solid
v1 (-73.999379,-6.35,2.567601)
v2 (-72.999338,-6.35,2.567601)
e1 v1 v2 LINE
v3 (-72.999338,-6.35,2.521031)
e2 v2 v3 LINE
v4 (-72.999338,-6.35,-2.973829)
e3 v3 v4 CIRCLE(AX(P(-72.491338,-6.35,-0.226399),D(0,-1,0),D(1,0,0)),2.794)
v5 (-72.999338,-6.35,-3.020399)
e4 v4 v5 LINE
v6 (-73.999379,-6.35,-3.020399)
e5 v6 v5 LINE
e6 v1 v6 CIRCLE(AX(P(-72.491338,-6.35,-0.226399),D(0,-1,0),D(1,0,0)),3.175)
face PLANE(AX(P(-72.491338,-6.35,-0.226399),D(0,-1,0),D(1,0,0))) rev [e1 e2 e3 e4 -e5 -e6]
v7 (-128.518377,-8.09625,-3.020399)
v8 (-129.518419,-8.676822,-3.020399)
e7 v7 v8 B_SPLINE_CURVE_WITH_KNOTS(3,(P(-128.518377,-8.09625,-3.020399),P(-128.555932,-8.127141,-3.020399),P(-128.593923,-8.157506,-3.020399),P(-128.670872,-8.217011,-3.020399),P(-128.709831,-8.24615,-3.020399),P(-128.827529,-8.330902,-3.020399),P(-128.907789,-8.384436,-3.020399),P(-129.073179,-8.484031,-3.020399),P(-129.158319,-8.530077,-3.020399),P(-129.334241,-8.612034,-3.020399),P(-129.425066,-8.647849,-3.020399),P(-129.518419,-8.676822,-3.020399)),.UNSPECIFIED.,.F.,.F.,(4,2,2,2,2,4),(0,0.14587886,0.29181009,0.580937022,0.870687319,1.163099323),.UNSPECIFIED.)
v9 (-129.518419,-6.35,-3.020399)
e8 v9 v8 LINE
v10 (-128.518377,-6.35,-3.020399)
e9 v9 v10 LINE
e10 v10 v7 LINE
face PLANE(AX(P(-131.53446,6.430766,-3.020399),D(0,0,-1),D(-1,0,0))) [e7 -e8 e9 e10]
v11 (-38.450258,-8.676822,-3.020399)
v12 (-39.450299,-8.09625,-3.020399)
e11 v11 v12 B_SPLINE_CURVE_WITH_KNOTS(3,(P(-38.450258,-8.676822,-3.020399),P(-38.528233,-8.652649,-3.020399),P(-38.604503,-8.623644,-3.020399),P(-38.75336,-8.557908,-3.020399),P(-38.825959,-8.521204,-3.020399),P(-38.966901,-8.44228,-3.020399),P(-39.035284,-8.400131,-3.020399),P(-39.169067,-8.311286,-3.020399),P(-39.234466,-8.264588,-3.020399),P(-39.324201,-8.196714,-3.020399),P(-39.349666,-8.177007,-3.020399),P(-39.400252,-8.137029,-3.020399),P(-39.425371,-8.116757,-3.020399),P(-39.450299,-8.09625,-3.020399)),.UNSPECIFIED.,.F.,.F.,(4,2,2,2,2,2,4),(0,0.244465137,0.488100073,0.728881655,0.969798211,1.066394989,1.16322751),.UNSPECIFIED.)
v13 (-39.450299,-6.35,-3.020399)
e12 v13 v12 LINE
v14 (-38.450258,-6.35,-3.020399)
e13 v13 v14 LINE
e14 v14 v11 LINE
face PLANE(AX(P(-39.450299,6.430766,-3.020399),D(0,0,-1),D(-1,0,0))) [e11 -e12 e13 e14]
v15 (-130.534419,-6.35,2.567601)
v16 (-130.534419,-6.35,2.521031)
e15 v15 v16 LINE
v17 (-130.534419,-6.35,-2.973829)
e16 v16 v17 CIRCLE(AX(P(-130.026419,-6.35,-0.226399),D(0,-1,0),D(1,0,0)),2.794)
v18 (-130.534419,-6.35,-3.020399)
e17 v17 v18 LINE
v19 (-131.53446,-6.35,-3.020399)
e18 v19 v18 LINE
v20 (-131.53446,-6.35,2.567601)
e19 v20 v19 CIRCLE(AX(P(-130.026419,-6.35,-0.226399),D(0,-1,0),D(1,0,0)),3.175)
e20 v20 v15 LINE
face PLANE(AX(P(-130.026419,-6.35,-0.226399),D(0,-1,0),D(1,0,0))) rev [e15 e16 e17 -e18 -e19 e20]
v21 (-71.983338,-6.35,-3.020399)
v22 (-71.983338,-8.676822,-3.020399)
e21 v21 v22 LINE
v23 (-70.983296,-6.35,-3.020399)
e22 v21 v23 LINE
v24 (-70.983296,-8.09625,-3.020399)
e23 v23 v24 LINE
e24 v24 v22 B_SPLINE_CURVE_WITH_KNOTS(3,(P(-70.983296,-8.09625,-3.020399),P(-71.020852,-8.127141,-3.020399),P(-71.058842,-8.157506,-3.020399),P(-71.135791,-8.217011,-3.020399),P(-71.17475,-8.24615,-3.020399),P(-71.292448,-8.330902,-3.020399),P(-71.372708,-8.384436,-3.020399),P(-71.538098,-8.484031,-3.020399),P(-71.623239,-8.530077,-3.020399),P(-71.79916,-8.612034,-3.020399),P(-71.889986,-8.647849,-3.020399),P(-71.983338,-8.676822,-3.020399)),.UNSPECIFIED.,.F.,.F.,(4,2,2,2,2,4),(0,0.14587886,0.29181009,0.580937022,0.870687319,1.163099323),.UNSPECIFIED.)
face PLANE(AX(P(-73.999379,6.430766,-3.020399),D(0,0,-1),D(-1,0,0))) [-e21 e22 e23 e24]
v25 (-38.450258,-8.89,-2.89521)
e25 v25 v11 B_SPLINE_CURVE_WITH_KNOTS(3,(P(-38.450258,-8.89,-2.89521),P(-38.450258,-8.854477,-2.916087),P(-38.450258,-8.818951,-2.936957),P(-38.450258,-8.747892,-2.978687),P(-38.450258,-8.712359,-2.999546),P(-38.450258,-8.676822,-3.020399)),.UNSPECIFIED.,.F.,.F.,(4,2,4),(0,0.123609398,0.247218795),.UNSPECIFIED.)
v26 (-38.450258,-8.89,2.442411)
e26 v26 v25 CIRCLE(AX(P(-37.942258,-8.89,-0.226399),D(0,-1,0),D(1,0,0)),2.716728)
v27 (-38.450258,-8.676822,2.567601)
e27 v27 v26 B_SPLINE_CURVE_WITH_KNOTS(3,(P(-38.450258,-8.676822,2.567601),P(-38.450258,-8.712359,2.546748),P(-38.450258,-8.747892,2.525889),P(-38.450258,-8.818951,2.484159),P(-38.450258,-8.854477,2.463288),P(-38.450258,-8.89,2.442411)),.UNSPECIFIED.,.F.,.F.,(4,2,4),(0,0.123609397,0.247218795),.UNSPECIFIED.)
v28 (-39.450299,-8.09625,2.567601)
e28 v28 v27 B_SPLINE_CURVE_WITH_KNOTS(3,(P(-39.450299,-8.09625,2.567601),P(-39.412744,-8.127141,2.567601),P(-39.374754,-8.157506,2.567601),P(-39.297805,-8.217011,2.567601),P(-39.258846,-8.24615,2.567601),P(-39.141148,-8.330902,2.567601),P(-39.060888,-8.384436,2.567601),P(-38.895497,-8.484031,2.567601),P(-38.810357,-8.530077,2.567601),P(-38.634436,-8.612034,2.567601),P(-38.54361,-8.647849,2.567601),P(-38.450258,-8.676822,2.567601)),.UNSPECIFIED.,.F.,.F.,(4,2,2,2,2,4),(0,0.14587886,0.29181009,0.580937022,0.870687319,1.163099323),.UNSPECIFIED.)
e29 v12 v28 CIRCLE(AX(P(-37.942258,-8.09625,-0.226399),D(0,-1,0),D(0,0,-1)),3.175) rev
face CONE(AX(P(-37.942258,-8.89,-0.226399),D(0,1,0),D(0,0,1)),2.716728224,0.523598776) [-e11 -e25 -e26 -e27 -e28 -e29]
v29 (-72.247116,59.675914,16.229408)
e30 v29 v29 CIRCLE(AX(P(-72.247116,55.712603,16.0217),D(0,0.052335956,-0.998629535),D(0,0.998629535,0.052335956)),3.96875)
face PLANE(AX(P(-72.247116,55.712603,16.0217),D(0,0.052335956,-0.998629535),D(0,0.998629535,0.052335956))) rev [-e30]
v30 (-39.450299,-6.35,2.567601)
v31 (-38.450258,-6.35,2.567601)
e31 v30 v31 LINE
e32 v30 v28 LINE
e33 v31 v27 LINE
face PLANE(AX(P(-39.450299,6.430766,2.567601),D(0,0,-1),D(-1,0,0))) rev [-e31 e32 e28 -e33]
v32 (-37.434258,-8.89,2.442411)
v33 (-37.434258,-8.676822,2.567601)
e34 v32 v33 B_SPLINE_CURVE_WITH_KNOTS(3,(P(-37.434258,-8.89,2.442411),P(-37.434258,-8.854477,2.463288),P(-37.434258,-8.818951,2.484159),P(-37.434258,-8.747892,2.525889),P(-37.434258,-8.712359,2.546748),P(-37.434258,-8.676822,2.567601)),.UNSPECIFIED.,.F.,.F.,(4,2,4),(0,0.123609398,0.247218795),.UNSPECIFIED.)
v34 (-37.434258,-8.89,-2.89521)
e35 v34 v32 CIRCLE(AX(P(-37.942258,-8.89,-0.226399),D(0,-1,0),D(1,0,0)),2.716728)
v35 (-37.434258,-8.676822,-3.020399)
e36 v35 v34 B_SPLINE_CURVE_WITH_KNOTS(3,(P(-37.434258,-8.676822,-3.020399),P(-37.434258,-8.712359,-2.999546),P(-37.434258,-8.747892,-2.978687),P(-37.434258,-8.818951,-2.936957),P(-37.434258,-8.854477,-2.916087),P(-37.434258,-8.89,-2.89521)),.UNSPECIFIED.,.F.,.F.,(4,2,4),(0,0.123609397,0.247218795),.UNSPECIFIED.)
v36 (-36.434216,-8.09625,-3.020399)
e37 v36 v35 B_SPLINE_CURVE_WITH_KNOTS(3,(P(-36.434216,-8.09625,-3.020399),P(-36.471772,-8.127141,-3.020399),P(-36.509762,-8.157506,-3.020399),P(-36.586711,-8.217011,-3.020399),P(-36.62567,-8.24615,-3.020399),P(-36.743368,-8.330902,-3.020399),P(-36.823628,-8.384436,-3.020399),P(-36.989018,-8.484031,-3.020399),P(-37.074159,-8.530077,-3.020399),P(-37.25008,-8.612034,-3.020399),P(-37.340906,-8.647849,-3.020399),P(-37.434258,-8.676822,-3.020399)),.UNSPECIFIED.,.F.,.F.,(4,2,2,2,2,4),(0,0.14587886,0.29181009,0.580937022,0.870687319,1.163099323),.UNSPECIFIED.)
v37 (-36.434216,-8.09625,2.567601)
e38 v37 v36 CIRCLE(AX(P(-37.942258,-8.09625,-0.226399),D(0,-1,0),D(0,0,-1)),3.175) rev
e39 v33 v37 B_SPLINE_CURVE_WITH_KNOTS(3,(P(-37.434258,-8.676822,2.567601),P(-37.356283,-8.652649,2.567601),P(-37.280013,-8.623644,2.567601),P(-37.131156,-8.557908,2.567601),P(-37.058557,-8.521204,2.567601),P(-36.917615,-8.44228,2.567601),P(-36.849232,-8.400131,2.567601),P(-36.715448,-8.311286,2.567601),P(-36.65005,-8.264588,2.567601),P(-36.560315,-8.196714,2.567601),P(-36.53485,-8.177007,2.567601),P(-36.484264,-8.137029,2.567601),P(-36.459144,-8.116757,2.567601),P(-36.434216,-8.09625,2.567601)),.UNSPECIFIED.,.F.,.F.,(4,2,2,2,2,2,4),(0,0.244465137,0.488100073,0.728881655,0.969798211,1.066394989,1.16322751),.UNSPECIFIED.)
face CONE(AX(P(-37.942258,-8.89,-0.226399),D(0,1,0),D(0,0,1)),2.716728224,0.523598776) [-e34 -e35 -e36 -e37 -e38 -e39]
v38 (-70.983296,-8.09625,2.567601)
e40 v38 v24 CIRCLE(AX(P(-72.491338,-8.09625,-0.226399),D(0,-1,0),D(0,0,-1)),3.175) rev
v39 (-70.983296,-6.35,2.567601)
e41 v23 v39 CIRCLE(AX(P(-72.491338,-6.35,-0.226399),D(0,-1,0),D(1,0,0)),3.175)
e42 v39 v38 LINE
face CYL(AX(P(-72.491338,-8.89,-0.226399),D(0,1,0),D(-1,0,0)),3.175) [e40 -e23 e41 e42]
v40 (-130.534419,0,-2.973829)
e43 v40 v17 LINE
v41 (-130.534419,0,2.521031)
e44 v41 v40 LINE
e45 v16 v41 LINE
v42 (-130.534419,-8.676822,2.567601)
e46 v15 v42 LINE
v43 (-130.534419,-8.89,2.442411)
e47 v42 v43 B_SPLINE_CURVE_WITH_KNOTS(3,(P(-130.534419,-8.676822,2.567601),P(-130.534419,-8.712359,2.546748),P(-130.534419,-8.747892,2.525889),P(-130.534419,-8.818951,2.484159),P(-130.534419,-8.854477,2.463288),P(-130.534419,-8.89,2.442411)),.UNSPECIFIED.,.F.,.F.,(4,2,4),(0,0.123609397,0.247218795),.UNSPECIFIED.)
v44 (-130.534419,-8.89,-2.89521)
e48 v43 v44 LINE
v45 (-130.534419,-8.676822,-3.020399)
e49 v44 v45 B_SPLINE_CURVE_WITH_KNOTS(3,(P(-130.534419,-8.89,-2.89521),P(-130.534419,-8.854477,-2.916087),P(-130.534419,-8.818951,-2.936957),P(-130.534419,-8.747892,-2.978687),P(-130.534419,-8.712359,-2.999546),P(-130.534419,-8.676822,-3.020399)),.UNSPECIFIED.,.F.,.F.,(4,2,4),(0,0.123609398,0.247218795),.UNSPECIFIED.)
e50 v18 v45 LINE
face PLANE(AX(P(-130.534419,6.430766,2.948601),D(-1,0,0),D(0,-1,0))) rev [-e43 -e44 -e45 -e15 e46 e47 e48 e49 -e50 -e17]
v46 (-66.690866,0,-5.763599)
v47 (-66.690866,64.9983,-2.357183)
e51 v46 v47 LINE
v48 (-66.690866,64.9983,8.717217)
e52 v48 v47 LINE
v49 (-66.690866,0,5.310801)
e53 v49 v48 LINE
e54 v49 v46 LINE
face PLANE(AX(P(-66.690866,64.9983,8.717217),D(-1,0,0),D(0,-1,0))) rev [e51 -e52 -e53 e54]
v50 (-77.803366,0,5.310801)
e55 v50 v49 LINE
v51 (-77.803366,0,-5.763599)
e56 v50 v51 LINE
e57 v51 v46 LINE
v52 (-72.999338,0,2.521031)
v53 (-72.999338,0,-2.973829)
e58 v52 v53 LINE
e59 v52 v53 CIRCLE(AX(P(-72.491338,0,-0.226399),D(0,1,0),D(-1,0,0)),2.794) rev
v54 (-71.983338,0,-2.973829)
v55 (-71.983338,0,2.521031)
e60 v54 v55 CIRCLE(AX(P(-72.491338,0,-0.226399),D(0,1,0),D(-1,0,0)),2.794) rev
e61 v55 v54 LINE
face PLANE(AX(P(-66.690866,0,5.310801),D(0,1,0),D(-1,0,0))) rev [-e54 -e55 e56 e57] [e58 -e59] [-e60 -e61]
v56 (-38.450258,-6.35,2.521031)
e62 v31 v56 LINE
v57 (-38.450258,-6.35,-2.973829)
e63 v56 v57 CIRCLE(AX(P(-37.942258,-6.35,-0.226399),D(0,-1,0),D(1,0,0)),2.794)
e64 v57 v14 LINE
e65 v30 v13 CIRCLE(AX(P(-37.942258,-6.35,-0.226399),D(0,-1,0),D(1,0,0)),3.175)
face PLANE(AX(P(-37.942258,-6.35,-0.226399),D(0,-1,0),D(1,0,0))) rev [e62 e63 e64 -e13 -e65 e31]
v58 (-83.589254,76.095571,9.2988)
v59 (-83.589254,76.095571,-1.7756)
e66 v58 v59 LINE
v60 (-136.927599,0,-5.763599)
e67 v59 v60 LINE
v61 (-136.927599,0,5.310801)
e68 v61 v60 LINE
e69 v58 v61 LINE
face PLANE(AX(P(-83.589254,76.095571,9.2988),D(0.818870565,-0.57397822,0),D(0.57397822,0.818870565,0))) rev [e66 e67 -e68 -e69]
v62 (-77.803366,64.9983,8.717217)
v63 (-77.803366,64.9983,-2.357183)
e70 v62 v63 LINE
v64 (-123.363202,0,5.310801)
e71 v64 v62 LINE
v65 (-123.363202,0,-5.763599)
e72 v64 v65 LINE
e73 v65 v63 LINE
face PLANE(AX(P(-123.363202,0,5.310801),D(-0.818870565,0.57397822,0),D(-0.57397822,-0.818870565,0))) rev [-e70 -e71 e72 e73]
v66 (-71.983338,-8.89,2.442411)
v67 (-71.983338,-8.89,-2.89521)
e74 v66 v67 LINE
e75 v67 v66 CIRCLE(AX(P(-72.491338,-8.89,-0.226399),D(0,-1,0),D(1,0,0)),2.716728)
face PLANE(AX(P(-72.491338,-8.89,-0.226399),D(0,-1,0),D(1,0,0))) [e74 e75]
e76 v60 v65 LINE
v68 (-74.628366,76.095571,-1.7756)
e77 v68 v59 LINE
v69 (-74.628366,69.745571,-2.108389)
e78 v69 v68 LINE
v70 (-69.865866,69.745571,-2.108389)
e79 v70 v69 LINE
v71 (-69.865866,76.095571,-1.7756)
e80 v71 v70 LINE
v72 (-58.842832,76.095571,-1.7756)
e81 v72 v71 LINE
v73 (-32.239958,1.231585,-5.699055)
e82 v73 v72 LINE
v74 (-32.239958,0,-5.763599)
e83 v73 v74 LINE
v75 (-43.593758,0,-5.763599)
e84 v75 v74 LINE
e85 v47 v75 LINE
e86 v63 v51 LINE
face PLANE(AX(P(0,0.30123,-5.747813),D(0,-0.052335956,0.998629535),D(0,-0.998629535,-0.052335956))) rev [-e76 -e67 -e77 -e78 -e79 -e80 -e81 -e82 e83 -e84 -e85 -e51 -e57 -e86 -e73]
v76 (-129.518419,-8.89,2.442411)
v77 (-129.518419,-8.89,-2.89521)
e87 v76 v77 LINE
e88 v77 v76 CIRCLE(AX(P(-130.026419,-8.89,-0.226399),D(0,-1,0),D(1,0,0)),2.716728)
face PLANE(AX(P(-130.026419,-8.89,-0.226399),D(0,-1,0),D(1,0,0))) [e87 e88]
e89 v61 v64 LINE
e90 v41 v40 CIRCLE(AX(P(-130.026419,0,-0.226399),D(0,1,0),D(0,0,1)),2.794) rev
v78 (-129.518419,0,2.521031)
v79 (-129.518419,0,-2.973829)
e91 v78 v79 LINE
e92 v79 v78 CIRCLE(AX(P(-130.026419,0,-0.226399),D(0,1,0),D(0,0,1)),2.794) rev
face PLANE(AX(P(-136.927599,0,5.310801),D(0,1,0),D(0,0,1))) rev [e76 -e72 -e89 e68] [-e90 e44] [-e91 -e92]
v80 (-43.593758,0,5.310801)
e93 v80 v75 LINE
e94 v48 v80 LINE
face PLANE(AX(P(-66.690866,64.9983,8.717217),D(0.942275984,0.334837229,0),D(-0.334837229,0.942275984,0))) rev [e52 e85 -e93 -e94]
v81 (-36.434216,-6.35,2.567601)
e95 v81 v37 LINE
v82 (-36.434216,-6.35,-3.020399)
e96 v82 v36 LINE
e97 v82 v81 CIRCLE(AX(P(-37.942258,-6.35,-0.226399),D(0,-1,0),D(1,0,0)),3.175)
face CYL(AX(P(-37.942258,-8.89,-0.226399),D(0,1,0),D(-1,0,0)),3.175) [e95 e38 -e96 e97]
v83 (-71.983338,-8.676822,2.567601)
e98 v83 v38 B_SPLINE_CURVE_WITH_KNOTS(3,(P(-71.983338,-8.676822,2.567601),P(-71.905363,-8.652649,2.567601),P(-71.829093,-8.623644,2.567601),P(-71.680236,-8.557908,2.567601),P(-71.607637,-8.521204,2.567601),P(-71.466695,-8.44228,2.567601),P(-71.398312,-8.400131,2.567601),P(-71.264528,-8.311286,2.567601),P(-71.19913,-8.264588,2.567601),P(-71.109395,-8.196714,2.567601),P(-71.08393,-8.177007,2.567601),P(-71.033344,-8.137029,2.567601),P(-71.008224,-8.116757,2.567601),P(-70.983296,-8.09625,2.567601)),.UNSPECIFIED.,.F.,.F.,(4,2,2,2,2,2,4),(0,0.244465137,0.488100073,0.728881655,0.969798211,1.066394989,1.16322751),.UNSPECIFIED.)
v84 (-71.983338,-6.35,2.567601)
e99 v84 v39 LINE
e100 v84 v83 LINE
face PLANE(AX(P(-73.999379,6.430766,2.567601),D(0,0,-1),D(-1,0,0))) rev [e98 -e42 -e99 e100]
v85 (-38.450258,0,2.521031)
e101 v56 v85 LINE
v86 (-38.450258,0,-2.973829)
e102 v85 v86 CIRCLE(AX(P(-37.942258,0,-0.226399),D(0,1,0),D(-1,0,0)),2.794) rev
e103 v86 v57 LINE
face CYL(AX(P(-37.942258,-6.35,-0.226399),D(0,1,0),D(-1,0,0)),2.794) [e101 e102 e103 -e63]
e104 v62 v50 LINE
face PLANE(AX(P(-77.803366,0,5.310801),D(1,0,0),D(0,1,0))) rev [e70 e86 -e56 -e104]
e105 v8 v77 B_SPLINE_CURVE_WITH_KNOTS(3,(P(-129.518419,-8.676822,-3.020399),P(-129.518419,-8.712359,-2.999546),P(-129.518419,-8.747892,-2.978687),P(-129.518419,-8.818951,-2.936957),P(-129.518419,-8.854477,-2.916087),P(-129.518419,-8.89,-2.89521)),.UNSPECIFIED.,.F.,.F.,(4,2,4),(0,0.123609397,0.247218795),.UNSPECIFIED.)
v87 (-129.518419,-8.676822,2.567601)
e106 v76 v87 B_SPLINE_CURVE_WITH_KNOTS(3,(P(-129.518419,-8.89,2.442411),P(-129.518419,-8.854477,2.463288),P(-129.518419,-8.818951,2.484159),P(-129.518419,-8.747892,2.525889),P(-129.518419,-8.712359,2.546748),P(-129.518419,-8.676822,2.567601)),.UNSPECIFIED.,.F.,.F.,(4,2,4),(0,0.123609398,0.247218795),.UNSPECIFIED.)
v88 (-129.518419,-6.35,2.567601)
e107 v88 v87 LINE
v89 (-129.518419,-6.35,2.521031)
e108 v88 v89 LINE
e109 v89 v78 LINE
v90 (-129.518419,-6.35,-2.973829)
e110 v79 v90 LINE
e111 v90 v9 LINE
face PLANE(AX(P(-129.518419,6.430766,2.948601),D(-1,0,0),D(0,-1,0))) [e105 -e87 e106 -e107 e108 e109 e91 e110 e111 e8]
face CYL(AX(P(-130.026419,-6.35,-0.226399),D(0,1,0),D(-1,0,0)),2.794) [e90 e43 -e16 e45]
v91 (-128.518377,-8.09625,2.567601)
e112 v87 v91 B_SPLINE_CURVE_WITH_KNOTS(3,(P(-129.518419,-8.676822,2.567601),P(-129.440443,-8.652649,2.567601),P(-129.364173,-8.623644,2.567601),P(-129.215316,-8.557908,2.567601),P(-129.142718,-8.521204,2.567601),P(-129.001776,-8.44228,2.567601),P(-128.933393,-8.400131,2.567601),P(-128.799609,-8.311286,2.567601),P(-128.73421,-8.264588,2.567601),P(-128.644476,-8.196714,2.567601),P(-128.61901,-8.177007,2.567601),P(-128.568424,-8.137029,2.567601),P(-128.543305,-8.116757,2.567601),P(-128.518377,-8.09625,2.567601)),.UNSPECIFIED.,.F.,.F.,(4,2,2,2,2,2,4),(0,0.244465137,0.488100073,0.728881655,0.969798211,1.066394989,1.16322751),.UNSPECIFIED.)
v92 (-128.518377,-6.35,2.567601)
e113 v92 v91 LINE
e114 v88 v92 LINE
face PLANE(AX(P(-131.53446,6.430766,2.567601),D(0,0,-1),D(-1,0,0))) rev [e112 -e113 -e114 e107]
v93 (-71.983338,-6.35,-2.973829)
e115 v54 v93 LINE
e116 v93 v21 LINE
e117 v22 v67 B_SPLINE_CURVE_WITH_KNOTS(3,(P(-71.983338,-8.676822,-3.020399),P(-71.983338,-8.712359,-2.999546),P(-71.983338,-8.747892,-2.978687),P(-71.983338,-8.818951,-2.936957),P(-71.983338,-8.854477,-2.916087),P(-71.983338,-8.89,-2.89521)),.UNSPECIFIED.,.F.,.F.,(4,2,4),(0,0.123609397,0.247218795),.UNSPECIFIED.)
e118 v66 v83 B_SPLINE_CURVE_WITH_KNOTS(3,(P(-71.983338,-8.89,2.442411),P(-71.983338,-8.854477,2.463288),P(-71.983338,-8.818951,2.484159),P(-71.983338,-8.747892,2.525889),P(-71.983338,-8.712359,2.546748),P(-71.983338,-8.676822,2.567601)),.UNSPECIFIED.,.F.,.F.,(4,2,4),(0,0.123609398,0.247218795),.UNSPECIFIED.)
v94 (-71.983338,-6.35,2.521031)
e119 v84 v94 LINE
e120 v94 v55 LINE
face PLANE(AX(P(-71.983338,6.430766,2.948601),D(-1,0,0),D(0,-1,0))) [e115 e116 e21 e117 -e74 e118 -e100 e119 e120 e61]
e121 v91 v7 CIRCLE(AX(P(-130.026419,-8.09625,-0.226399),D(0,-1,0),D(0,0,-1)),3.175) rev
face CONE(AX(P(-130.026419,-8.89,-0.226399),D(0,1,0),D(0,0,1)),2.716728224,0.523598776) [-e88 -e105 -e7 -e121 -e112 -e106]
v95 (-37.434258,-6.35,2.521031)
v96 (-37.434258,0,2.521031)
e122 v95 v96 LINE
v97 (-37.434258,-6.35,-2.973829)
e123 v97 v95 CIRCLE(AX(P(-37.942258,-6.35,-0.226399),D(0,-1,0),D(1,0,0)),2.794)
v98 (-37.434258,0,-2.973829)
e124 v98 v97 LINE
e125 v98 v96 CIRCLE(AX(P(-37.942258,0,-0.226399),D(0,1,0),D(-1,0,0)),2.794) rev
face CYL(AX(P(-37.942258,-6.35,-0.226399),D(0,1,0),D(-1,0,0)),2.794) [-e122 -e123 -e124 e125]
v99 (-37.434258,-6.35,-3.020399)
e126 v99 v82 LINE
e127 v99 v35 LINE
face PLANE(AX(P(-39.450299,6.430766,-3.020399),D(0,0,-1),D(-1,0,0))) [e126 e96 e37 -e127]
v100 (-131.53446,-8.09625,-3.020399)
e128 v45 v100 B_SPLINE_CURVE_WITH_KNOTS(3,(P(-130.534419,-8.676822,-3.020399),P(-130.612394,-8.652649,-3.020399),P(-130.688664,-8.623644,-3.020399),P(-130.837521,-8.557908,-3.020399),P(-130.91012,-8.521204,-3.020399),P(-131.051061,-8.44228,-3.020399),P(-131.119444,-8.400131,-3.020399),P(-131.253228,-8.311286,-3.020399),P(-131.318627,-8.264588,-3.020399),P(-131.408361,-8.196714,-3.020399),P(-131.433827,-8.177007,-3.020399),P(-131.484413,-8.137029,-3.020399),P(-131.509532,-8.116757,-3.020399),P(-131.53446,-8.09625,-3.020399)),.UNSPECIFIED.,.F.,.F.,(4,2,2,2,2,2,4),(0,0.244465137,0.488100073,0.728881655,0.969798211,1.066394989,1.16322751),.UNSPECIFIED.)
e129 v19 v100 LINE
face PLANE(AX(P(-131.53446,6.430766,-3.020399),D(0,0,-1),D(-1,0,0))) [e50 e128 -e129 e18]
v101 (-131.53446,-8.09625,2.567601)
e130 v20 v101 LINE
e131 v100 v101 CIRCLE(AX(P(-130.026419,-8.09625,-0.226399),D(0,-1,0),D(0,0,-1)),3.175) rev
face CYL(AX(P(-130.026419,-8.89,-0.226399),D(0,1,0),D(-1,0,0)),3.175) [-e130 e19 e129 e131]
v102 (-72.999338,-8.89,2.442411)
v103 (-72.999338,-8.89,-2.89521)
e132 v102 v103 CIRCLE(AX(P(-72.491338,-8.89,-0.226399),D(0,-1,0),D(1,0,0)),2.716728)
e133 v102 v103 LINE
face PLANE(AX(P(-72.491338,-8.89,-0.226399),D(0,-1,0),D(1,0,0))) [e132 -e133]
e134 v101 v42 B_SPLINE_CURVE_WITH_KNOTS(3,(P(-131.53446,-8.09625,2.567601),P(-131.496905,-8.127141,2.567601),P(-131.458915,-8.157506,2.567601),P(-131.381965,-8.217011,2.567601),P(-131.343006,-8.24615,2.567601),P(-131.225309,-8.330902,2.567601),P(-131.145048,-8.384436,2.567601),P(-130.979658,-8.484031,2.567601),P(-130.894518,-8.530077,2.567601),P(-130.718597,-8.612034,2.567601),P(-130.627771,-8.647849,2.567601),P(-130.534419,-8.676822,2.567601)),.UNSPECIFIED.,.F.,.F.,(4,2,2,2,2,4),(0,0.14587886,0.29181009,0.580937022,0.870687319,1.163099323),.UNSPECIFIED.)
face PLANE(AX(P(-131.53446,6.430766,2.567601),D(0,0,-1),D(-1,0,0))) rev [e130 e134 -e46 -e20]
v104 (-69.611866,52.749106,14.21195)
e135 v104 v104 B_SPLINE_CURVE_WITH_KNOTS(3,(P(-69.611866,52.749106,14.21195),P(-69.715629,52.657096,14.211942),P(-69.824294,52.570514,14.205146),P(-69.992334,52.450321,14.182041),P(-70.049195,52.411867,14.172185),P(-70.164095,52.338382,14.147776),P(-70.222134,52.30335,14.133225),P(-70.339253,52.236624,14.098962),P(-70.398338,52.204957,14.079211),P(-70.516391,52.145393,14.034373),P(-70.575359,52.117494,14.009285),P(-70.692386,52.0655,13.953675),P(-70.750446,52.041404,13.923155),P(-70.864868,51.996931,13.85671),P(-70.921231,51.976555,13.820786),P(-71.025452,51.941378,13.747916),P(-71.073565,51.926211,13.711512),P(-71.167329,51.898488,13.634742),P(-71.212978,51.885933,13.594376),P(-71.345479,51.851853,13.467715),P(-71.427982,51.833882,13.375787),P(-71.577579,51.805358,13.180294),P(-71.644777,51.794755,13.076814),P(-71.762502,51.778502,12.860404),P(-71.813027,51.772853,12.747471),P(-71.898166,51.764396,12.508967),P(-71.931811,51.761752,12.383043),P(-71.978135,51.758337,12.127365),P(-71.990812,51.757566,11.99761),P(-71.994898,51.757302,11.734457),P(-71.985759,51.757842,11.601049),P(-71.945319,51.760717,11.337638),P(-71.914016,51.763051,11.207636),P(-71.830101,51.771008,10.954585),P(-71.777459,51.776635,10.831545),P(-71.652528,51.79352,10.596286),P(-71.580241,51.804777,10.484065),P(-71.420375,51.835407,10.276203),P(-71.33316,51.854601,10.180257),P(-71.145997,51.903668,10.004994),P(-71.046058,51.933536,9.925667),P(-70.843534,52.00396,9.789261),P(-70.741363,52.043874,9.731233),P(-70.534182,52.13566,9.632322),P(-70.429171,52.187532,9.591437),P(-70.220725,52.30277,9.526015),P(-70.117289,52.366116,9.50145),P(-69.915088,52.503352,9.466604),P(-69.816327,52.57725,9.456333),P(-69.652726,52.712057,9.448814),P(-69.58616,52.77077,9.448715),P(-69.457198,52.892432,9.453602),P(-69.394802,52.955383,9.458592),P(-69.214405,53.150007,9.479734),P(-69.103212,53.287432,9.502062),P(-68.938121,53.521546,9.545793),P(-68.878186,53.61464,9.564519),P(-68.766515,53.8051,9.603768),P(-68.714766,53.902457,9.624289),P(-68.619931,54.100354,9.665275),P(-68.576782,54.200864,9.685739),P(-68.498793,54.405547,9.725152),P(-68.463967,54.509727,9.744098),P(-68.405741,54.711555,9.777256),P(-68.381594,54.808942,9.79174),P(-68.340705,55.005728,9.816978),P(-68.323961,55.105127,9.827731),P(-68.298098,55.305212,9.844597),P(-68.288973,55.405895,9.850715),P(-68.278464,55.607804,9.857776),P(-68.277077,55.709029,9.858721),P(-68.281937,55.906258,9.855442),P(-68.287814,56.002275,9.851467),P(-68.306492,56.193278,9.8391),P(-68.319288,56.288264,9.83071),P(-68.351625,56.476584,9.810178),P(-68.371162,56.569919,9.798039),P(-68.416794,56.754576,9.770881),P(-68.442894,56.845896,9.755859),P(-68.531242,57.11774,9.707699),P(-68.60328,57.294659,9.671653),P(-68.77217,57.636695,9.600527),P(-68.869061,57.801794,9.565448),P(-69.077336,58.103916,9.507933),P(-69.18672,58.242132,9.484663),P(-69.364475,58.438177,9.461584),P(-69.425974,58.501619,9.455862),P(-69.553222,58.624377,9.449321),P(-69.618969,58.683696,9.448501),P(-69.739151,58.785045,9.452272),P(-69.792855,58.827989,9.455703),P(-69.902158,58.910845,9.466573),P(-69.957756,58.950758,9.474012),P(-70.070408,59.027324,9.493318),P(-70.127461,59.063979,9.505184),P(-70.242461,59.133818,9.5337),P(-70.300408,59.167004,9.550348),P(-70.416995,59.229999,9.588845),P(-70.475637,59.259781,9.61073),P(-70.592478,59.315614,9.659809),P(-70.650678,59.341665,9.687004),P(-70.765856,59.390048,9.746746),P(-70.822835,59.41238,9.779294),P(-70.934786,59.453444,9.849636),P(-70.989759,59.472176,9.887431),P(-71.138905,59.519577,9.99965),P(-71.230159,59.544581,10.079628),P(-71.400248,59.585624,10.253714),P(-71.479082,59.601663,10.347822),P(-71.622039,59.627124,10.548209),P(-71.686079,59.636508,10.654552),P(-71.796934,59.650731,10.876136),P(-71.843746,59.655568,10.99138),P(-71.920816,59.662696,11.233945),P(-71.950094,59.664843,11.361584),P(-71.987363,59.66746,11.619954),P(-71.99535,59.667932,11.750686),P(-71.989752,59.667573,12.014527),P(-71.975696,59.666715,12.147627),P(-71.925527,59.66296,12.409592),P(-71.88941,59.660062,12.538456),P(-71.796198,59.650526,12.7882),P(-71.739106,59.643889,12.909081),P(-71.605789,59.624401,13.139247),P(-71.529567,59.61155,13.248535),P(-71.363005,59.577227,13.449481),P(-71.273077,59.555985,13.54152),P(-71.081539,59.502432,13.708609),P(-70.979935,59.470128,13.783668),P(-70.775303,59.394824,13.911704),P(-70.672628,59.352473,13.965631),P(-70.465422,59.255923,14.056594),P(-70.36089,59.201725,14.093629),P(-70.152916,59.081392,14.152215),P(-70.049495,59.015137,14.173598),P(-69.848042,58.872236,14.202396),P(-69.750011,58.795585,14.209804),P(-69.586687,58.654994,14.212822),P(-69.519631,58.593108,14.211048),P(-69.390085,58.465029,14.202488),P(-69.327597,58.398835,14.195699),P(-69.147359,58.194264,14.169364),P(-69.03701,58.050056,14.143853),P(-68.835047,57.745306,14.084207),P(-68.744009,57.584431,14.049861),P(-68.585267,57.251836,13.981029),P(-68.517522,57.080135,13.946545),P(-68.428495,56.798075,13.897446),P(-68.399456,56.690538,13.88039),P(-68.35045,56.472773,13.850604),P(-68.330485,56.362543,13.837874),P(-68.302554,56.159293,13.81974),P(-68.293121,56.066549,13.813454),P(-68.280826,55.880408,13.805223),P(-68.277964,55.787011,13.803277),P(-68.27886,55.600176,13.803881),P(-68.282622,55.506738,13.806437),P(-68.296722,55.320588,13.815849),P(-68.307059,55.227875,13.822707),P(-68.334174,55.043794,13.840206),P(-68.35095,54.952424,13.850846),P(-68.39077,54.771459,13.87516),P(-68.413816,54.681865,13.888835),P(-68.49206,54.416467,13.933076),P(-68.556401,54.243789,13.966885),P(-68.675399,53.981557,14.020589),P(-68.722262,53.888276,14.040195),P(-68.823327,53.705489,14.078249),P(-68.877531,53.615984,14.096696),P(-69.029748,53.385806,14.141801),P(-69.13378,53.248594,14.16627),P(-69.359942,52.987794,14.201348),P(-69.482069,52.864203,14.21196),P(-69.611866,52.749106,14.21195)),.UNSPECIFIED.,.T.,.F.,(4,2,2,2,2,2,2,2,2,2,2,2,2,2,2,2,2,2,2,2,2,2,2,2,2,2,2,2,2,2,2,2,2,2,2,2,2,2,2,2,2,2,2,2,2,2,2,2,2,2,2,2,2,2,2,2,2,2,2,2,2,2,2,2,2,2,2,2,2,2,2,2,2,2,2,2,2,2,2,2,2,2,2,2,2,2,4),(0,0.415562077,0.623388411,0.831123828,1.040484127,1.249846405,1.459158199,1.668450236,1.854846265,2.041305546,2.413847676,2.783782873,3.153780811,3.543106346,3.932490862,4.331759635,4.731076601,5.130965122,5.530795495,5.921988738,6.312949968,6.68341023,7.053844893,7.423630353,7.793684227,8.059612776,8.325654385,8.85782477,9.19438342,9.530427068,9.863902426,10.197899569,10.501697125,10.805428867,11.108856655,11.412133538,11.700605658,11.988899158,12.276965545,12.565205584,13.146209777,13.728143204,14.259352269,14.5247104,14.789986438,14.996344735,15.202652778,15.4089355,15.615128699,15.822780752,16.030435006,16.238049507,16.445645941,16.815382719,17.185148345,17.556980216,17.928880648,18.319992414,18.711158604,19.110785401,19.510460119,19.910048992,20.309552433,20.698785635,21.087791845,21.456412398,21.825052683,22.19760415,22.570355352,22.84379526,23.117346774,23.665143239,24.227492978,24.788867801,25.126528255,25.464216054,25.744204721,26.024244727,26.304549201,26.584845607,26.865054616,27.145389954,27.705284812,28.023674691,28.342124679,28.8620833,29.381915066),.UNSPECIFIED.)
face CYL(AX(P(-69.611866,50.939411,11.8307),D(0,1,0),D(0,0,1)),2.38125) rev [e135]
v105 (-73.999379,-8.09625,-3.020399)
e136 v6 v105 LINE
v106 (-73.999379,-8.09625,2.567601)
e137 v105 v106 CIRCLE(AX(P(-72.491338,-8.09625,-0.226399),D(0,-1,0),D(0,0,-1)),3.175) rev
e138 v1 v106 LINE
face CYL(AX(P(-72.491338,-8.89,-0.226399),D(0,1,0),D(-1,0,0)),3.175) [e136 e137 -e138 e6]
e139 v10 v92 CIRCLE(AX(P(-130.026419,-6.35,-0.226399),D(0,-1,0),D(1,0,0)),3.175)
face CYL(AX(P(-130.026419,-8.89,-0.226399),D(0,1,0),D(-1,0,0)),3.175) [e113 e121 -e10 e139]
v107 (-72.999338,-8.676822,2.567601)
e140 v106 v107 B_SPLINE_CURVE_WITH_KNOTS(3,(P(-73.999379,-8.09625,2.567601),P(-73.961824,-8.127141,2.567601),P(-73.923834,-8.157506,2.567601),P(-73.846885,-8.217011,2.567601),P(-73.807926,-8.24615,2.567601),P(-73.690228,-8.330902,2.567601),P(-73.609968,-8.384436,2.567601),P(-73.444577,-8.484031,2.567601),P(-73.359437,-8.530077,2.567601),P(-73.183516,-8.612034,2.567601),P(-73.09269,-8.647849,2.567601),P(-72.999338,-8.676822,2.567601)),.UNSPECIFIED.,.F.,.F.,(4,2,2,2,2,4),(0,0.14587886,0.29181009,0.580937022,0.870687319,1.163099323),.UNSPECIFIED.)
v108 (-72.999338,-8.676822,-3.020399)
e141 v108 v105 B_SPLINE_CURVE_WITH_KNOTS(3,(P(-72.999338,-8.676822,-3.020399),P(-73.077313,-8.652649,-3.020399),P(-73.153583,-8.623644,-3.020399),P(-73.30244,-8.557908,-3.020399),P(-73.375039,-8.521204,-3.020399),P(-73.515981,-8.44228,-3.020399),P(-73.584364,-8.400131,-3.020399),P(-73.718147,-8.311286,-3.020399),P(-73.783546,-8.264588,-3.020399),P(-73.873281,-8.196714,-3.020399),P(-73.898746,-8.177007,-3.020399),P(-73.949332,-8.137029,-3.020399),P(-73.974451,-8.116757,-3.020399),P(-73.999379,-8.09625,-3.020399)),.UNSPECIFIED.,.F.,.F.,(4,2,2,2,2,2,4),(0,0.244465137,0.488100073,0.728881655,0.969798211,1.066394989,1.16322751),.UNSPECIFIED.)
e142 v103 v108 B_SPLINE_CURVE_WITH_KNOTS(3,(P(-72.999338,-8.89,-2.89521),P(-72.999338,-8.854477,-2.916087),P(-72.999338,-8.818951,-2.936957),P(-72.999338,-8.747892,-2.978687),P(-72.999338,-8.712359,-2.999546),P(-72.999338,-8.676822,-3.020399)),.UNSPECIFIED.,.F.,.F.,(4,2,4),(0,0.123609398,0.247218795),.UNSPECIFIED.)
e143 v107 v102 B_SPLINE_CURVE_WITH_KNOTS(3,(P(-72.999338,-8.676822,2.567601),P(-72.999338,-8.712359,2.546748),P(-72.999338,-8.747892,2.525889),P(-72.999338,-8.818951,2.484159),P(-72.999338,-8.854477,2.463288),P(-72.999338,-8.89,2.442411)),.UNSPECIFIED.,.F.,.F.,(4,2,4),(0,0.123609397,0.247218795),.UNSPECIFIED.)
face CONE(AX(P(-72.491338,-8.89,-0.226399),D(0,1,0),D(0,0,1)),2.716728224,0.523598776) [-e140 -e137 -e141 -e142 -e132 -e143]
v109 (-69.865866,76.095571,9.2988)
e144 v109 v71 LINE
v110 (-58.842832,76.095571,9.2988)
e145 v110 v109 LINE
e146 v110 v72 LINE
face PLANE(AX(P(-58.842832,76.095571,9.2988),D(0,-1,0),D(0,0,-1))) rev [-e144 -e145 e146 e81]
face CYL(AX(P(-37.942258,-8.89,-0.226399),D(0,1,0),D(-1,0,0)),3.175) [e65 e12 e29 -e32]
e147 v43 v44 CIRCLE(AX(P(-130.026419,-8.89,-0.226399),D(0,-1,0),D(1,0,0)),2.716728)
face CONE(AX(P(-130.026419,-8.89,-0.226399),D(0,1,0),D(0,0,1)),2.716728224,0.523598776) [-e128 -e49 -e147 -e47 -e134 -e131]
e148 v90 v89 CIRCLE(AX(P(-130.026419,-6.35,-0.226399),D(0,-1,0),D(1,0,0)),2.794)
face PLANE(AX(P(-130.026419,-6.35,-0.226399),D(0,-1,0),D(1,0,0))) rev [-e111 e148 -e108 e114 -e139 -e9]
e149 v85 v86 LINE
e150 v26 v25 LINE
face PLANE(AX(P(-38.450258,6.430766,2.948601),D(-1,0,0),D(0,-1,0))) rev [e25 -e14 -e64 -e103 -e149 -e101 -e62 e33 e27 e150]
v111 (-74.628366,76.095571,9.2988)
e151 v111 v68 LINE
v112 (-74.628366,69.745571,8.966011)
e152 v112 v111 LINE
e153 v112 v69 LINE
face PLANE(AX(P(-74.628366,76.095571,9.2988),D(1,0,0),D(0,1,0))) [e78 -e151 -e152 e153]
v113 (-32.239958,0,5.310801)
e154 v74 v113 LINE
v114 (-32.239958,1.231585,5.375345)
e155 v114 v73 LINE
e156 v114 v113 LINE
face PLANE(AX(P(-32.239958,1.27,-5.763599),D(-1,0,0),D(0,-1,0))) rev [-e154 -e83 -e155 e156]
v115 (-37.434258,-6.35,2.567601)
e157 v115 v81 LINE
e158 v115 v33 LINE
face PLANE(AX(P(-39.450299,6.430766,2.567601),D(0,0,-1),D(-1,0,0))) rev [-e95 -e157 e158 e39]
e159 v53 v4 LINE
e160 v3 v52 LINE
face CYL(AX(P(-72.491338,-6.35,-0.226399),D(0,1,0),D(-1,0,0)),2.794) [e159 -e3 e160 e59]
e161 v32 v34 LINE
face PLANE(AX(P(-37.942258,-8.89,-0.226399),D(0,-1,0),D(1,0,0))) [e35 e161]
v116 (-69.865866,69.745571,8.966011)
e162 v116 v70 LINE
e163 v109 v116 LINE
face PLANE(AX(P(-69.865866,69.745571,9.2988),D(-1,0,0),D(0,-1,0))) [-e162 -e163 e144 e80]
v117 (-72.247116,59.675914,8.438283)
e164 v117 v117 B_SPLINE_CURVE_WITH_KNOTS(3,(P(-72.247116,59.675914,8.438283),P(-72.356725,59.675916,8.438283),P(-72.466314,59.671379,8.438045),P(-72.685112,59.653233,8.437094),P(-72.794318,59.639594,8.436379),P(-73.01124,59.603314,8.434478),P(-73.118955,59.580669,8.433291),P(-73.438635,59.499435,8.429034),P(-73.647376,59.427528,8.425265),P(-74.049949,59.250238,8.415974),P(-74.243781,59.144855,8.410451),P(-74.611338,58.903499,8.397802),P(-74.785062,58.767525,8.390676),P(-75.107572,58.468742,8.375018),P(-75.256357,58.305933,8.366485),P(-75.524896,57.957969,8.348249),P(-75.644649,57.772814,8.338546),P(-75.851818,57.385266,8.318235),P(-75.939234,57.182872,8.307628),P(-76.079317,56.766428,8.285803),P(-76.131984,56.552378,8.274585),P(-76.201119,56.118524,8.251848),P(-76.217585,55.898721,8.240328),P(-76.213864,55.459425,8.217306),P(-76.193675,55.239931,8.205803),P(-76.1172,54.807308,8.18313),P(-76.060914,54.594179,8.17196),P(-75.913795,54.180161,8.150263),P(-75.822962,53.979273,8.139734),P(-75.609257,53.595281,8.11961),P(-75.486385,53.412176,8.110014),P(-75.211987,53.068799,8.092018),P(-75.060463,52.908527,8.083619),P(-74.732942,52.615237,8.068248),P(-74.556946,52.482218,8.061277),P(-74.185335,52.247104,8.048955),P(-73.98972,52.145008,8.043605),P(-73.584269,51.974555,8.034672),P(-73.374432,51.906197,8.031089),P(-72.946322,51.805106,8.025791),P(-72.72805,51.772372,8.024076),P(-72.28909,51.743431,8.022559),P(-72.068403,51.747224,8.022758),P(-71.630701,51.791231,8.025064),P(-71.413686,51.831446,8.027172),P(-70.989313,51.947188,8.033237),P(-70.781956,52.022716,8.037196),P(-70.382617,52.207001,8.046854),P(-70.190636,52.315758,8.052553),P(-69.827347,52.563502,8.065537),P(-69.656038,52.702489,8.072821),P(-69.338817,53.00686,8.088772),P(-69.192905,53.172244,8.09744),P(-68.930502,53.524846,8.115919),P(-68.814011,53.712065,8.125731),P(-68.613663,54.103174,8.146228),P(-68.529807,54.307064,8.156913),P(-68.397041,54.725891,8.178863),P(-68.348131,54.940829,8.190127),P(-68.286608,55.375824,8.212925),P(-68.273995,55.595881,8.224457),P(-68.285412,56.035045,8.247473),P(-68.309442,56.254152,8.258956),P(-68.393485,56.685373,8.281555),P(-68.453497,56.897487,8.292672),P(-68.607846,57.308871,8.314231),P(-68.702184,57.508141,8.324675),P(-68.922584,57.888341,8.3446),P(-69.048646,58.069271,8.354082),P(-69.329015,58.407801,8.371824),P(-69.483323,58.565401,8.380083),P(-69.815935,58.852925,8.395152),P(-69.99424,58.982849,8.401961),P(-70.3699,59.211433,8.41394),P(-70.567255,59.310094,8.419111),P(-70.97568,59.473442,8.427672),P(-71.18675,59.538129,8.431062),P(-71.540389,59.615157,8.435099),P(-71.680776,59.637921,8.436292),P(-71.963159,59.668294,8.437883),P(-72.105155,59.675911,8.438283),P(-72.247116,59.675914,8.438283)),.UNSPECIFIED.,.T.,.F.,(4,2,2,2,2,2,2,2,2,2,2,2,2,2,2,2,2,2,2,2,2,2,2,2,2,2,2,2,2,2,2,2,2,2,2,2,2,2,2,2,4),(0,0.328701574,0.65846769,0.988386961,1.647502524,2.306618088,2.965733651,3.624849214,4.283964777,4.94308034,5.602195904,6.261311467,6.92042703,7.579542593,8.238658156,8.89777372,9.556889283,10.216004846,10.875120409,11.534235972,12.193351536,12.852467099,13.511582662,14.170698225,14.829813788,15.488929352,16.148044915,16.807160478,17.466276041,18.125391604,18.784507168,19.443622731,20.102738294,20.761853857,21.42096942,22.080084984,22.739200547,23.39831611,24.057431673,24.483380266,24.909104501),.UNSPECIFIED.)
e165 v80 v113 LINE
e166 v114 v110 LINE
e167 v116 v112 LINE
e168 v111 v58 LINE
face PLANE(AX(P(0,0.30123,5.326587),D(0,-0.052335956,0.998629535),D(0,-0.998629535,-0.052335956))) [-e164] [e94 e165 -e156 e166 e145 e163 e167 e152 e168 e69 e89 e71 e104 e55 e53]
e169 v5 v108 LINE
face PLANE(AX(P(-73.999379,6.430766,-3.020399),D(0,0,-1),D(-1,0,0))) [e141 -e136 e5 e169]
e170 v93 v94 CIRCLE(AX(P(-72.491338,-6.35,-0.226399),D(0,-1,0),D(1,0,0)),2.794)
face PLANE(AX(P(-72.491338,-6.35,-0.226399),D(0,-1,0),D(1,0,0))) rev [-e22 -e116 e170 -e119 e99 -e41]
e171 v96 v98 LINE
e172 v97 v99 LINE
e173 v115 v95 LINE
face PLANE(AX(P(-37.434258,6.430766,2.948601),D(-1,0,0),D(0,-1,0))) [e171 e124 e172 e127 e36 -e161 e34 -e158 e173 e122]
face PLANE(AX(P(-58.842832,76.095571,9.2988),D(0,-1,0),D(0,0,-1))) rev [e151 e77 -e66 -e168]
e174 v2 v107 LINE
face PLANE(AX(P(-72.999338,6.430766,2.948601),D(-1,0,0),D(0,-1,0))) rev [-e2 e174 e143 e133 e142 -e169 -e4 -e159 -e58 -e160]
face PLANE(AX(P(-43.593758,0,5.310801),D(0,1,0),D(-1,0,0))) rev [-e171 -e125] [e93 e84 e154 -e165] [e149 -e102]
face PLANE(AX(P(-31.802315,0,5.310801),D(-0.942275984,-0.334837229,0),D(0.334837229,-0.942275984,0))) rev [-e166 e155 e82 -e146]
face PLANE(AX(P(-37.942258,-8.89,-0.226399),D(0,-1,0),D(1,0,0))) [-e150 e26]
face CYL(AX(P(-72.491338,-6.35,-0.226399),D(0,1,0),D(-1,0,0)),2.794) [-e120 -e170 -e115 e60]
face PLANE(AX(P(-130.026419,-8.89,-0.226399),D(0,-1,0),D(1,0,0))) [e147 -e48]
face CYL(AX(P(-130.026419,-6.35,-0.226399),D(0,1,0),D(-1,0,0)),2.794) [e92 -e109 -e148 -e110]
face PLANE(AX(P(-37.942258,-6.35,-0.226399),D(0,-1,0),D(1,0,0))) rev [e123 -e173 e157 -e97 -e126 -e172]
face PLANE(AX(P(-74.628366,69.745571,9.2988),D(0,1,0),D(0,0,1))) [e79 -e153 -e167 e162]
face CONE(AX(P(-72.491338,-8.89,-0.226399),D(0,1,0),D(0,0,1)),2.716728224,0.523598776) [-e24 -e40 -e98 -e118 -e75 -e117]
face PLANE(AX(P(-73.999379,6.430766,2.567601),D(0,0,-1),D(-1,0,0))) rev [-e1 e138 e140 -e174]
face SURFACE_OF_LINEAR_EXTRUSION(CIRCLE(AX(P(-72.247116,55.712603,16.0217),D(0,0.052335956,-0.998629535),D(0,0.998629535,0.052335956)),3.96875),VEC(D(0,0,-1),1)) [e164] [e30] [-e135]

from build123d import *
from OCP.BRepFilletAPI import BRepFilletAPI_MakeChamfer

# Parameters (mm, degrees)
BOSS_EXTRUDE2_DEPTH     = 11.0744
CUT_EXTRUDE1_DEPTH      = 157.927278758
CUT_EXTRUDE1_DEPTH_BACK = 157.927278758
SKETCH3_W               = 4.7625
SKETCH3_H               = 6.35
CUT_EXTRUDE6_DEPTH      = 157.927278758
CUT_EXTRUDE6_DEPTH_BACK = 157.927278758
SKETCH12_W              = 1.27
SKETCH12_H              = 1.27
SKETCH12_W_2            = 12.7
SKETCH12_H_2            = 12.7
SKETCH13_R              = 2.794
BOSS_EXTRUDE3_DEPTH     = 6.35
SKETCH14_R              = 3.175
BOSS_EXTRUDE4_DEPTH     = 2.54
CUT_EXTRUDE7_REACH      = 163.425
SKETCH15_W              = 1.016
SKETCH15_H              = 6.35
SKETCH15_W_2            = 3.01608289
SKETCH15_H_2            = 0.381
SKETCH15_W_3            = 3.016082891
SKETCH17_R              = 3.96875
BOSS_EXTRUDE5_DEPTH     = 16.32204
SKETCH18_R              = 2.38125
CUT_EXTRUDE9_DEPTH      = 5.334
CHAMFER1_SIZE           = 0.79375
CHAMFER1_SIZE2          = 0.458271776
SKETCH19_W              = 6.0325
SKETCH19_H              = 64.754314085
BOSS_EXTRUDE6_DEPTH     = 8.542621607


with BuildPart() as part:
    # Sketch2 → Boss-Extrude2 (new, along a direction that is not the sketch's normal)
    with BuildSketch(Plane(origin=(0, 0.301230094, -5.747812595), x_dir=(1, 0, 0), z_dir=(0, -0.052335956242947394, 0.9986295347545737))):
        Polygon((-31.802314895, -0.301643486), (-58.84283214, 75.898356514), (-83.589254333, 75.898356514), (-136.927598646, -0.301643486), (-123.363202182, -0.301643486), (-77.803366414, 64.785856514), (-77.803366414, -0.301643486), (-66.690866414, -0.301643486), (-66.690866414, 64.785856514), (-43.593757934, -0.301643486), align=None)
    extrude(amount=BOSS_EXTRUDE2_DEPTH, dir=(0, 0, 1))

    # Sketch3 → Cut-Extrude1 (cut, two sides: drawn at the far end of the back side and taken through both)
    with BuildSketch(Plane.XY.offset(-CUT_EXTRUDE1_DEPTH_BACK)):
        with Locations((-72.247116414, 72.920570548)):
            Rectangle(SKETCH3_W, SKETCH3_H)
    extrude(amount=CUT_EXTRUDE1_DEPTH + CUT_EXTRUDE1_DEPTH_BACK, mode=Mode.SUBTRACT)

    # Sketch12 → Cut-Extrude6 (cut, two sides: drawn at the far end of the back side and taken through both)
    with BuildSketch(Plane.XY.offset(-CUT_EXTRUDE6_DEPTH_BACK)):
        with Locations((-31.604957934, 0.635)):
            Rectangle(SKETCH12_W, SKETCH12_H)
        with Locations((-144.150562182, 6.35)):
            Rectangle(SKETCH12_W_2, SKETCH12_H_2)
    extrude(amount=CUT_EXTRUDE6_DEPTH + CUT_EXTRUDE6_DEPTH_BACK, mode=Mode.SUBTRACT)

    # Shell13: read off the stored shape, not the designer's step
    # Shell13: loft between two sections, ruled curve by curve
    shell13_from = [
        Edge.make_line((-41.800744563, 2.54, -3.086997877), (-67.036086729, 73.555570548, 0.63477047)),
        Edge.make_line((-60.635845511, 73.555570548, 0.63477047), (-35.400503345, 2.54, -3.086997877)),
        Edge.make_line((-35.400503345, 2.54, -3.086997877), (-41.800744563, 2.54, -3.086997877)),
        Edge.make_line((-67.036086729, 73.555570548, 0.63477047), (-60.635845511, 73.555570548, 0.63477047)),
    ]
    shell13_to = [
        Edge.make_line((-41.800744563, 2.54, 5.443916364), (-67.036086729, 73.555570548, 9.165684711)),
        Edge.make_line((-60.635845511, 73.555570548, 9.165684711), (-35.400503345, 2.54, 5.443916364)),
        Edge.make_line((-35.400503345, 2.54, 5.443916364), (-41.800744563, 2.54, 5.443916364)),
        Edge.make_line((-67.036086729, 73.555570548, 9.165684711), (-60.635845511, 73.555570548, 9.165684711)),
    ]
    shell13 = Solid(Shell([*[Face.make_surface_from_curves(shell13_from[k], shell13_to[k]) for k in range(4)], Face(Wire(shell13_from)), Face(Wire(shell13_to))]))
    add(shell13, mode=Mode.SUBTRACT)

    # Shell13 2: loft between two sections, ruled curve by curve
    shell13_2_from = [
        Edge.make_line((-75.263366414, 2.54, -3.086997877), (-69.230866414, 2.54, -3.086997877)),
        Edge.make_line((-69.230866414, 67.205570548, 0.301981071), (-75.263366414, 67.205570548, 0.301981071)),
        Edge.make_line((-69.230866414, 2.54, -3.086997877), (-69.230866414, 67.205570548, 0.301981071)),
        Edge.make_line((-75.263366414, 67.205570548, 0.301981071), (-75.263366414, 2.54, -3.086997877)),
    ]
    shell13_2_to = [
        Edge.make_line((-75.263366414, 2.54, 5.443916364), (-69.230866414, 2.54, 5.443916364)),
        Edge.make_line((-69.230866414, 67.205570548, 8.832895312), (-75.263366414, 67.205570548, 8.832895312)),
        Edge.make_line((-69.230866414, 2.54, 5.443916364), (-69.230866414, 67.205570548, 8.832895312)),
        Edge.make_line((-75.263366414, 67.205570548, 8.832895312), (-75.263366414, 2.54, 5.443916364)),
    ]
    shell13_2 = Solid(Shell([*[Face.make_surface_from_curves(shell13_2_from[k], shell13_2_to[k]) for k in range(4)], Face(Wire(shell13_2_from)), Face(Wire(shell13_2_to))]))
    add(shell13_2, mode=Mode.SUBTRACT)

    # Shell13 3: loft between two sections, ruled curve by curve
    shell13_3_from = [
        Edge.make_line((-132.045380565, 2.54, -3.086997877), (-124.684650731, 2.54, -3.086997877)),
        Edge.make_line((-77.168366414, 73.555570548, 0.63477047), (-82.267805784, 73.555570548, 0.63477047)),
        Edge.make_line((-82.267805784, 73.555570548, 0.63477047), (-132.045380565, 2.54, -3.086997877)),
        Edge.make_line((-124.684650731, 2.54, -3.086997877), (-77.168366414, 70.329482632, 0.465698366)),
        Edge.make_line((-77.168366414, 70.329482632, 0.465698366), (-77.168366414, 73.555570548, 0.63477047)),
    ]
    shell13_3_to = [
        Edge.make_line((-132.045380565, 2.54, 5.443916364), (-124.684650731, 2.54, 5.443916364)),
        Edge.make_line((-77.168366414, 73.555570548, 9.165684711), (-82.267805784, 73.555570548, 9.165684711)),
        Edge.make_line((-82.267805784, 73.555570548, 9.165684711), (-132.045380565, 2.54, 5.443916364)),
        Edge.make_line((-124.684650731, 2.54, 5.443916364), (-77.168366414, 70.329482632, 8.996612607)),
        Edge.make_line((-77.168366414, 70.329482632, 8.996612607), (-77.168366414, 73.555570548, 9.165684711)),
    ]
    shell13_3 = Solid(Shell([*[Face.make_surface_from_curves(shell13_3_from[k], shell13_3_to[k]) for k in range(5)], Face(Wire(shell13_3_from)), Face(Wire(shell13_3_to))]))
    add(shell13_3, mode=Mode.SUBTRACT)

    # Sketch13 → Boss-Extrude3 (add)
    with BuildSketch(Plane.XZ):
        with Locations(Location((-130.026418646, -0.226399396, 0), (0, 0, 90))):
            Circle(SKETCH13_R)
        with Locations(Location((-72.491337934, -0.226399396, 0), (0, 0, 180))):
            Circle(SKETCH13_R)
        with Locations(Location((-37.942257934, -0.226399396, 0), (0, 0, 180))):
            Circle(SKETCH13_R)
    extrude(amount=BOSS_EXTRUDE3_DEPTH)

    # Sketch14 → Boss-Extrude4 (add)
    with BuildSketch(Plane.XZ.offset(6.35)):
        with Locations((-130.026418646, -0.226399396)):
            Circle(SKETCH14_R)
        with Locations((-72.491337934, -0.226399396)):
            Circle(SKETCH14_R)
        with Locations((-37.942257934, -0.226399396)):
            Circle(SKETCH14_R)
    extrude(amount=BOSS_EXTRUDE4_DEPTH)

    # Cut-Extrude7: up to this face of the body (flat: up to its plane)
    cut_extrude7_end = Plane(part.part.faces().sort_by_distance((-136.752488628, 0, -0.226399396))[0])
    # Sketch15 → Cut-Extrude7 (cut, up to the picked face)
    with BuildSketch(Plane.XZ.offset(8.89), mode=Mode.PRIVATE) as cut_extrude7_sk1:
        with Locations((-130.026418646, -0.226399396)):
            Rectangle(SKETCH15_W, SKETCH15_H)
    cut_extrude7_tool1 = split(extrude(cut_extrude7_sk1.sketch, amount=-CUT_EXTRUDE7_REACH, mode=Mode.PRIVATE), bisect_by=cut_extrude7_end, keep=Keep.BOTH, mode=Mode.PRIVATE)
    # Sketch15 → Cut-Extrude7 (cut, up to the picked face)
    with BuildSketch(Plane.XZ.offset(8.89), mode=Mode.PRIVATE) as cut_extrude7_sk2:
        with Locations((-72.491337934, -0.226399396)):
            Rectangle(SKETCH15_W, SKETCH15_H)
    cut_extrude7_tool2 = split(extrude(cut_extrude7_sk2.sketch, amount=-CUT_EXTRUDE7_REACH, mode=Mode.PRIVATE), bisect_by=cut_extrude7_end, keep=Keep.BOTH, mode=Mode.PRIVATE)
    # Sketch15 → Cut-Extrude7 (cut, up to the picked face)
    with BuildSketch(Plane.XZ.offset(8.89), mode=Mode.PRIVATE) as cut_extrude7_sk3:
        with Locations((-37.942257934, -0.226399396)):
            Rectangle(SKETCH15_W, SKETCH15_H)
    cut_extrude7_tool3 = split(extrude(cut_extrude7_sk3.sketch, amount=-CUT_EXTRUDE7_REACH, mode=Mode.PRIVATE), bisect_by=cut_extrude7_end, keep=Keep.BOTH, mode=Mode.PRIVATE)
    # Sketch15 → Cut-Extrude7 (cut, up to the picked face)
    with BuildSketch(Plane.XZ.offset(8.89), mode=Mode.PRIVATE) as cut_extrude7_sk4:
        with Locations((-130.026418646, 2.758100604)):
            Rectangle(SKETCH15_W_2, SKETCH15_H_2)
    cut_extrude7_tool4 = split(extrude(cut_extrude7_sk4.sketch, amount=-CUT_EXTRUDE7_REACH, mode=Mode.PRIVATE), bisect_by=cut_extrude7_end, keep=Keep.BOTH, mode=Mode.PRIVATE)
    # Sketch15 → Cut-Extrude7 (cut, up to the picked face)
    with BuildSketch(Plane.XZ.offset(8.89), mode=Mode.PRIVATE) as cut_extrude7_sk5:
        with Locations((-130.026418646, -3.210899396)):
            Rectangle(SKETCH15_W_2, SKETCH15_H_2)
    cut_extrude7_tool5 = split(extrude(cut_extrude7_sk5.sketch, amount=-CUT_EXTRUDE7_REACH, mode=Mode.PRIVATE), bisect_by=cut_extrude7_end, keep=Keep.BOTH, mode=Mode.PRIVATE)
    # Sketch15 → Cut-Extrude7 (cut, up to the picked face)
    with BuildSketch(Plane.XZ.offset(8.89), mode=Mode.PRIVATE) as cut_extrude7_sk6:
        with Locations((-72.491337934, 2.758100604)):
            Rectangle(SKETCH15_W_3, SKETCH15_H_2)
    cut_extrude7_tool6 = split(extrude(cut_extrude7_sk6.sketch, amount=-CUT_EXTRUDE7_REACH, mode=Mode.PRIVATE), bisect_by=cut_extrude7_end, keep=Keep.BOTH, mode=Mode.PRIVATE)
    # Sketch15 → Cut-Extrude7 (cut, up to the picked face)
    with BuildSketch(Plane.XZ.offset(8.89), mode=Mode.PRIVATE) as cut_extrude7_sk7:
        with Locations((-72.491337934, -3.210899396)):
            Rectangle(SKETCH15_W_3, SKETCH15_H_2)
    cut_extrude7_tool7 = split(extrude(cut_extrude7_sk7.sketch, amount=-CUT_EXTRUDE7_REACH, mode=Mode.PRIVATE), bisect_by=cut_extrude7_end, keep=Keep.BOTH, mode=Mode.PRIVATE)
    # Sketch15 → Cut-Extrude7 (cut, up to the picked face)
    with BuildSketch(Plane.XZ.offset(8.89), mode=Mode.PRIVATE) as cut_extrude7_sk8:
        with Locations((-37.942257934, -3.210899396)):
            Rectangle(SKETCH15_W_3, SKETCH15_H_2)
    cut_extrude7_tool8 = split(extrude(cut_extrude7_sk8.sketch, amount=-CUT_EXTRUDE7_REACH, mode=Mode.PRIVATE), bisect_by=cut_extrude7_end, keep=Keep.BOTH, mode=Mode.PRIVATE)
    # Sketch15 → Cut-Extrude7 (cut, up to the picked face)
    with BuildSketch(Plane.XZ.offset(8.89), mode=Mode.PRIVATE) as cut_extrude7_sk9:
        with Locations((-37.942257934, 2.758100604)):
            Rectangle(SKETCH15_W_3, SKETCH15_H_2)
    cut_extrude7_tool9 = split(extrude(cut_extrude7_sk9.sketch, amount=-CUT_EXTRUDE7_REACH, mode=Mode.PRIVATE), bisect_by=cut_extrude7_end, keep=Keep.BOTH, mode=Mode.PRIVATE)
    add(cut_extrude7_tool1.solids().sort_by(Axis((-130.026419, -8.89, -0.226399), (0, 1, 0)))[0], mode=Mode.SUBTRACT)
    add(cut_extrude7_tool2.solids().sort_by(Axis((-72.491338, -8.89, -0.226399), (0, 1, 0)))[0], mode=Mode.SUBTRACT)
    add(cut_extrude7_tool3.solids().sort_by(Axis((-37.942258, -8.89, -0.226399), (0, 1, 0)))[0], mode=Mode.SUBTRACT)
    add(cut_extrude7_tool4.solids().sort_by(Axis((-130.026419, -8.89, 2.758101), (0, 1, 0)))[0], mode=Mode.SUBTRACT)
    add(cut_extrude7_tool5.solids().sort_by(Axis((-130.026419, -8.89, -3.210899), (0, 1, 0)))[0], mode=Mode.SUBTRACT)
    add(cut_extrude7_tool6.solids().sort_by(Axis((-72.491338, -8.89, 2.758101), (0, 1, 0)))[0], mode=Mode.SUBTRACT)
    add(cut_extrude7_tool7.solids().sort_by(Axis((-72.491338, -8.89, -3.210899), (0, 1, 0)))[0], mode=Mode.SUBTRACT)
    add(cut_extrude7_tool8.solids().sort_by(Axis((-37.942258, -8.89, -3.210899), (0, 1, 0)))[0], mode=Mode.SUBTRACT)
    add(cut_extrude7_tool9.solids().sort_by(Axis((-37.942258, -8.89, 2.758101), (0, 1, 0)))[0], mode=Mode.SUBTRACT)

    # Sketch17 → Boss-Extrude5 (add, along a direction that is not the sketch's normal)
    with BuildSketch(Plane(origin=(0, 0.168296765, -3.211293577), x_dir=(-1, 0, 0), z_dir=(0, 0.05233595624294736, -0.9986295347545738))):
        with Locations((72.247116414, 55.620532118)):
            Circle(SKETCH17_R)
    extrude(amount=-BOSS_EXTRUDE5_DEPTH, dir=(0, 0, -1))

    # Sketch18 → Cut-Extrude9 (cut, symmetric)
    with BuildSketch(Plane(origin=(0, 56.273410548, 0), x_dir=(1, 0, 0), z_dir=(0, 1, 0))):
        with Locations((-69.611866414, -11.830700158)):
            Circle(SKETCH18_R)
    extrude(amount=CUT_EXTRUDE9_DEPTH, both=True, mode=Mode.SUBTRACT)

    # Chamfer1: one chamfer whose edges measure the first distance from different faces: ONE call of the kernel's chamfer builder (chamfer() names one face for all edges)
    chamfer1_edges_1 = [part.edges().sort_by_distance(p)[0] for p in [
        (-133.201418646, -8.89, -0.226399396),
    ]]
    chamfer1_side_1 = [part.faces().sort_by_distance(p)[0] for p in [
        (-133.201418646, -7.62, -0.226399396),
    ]]
    chamfer1_edges_2 = [part.edges().sort_by_distance(p)[0] for p in [
        (-126.851418646, -8.89, -0.226399396),
    ]]
    chamfer1_side_2 = [part.faces().sort_by_distance(p)[0] for p in [
        (-126.851418646, -7.62, -0.226399396),
    ]]
    chamfer1_edges_3 = [part.edges().sort_by_distance(p)[0] for p in [
        (-75.666337934, -8.89, -0.226399396),
    ]]
    chamfer1_side_3 = [part.faces().sort_by_distance(p)[0] for p in [
        (-75.666337934, -7.62, -0.226399396),
    ]]
    chamfer1_edges_4 = [part.edges().sort_by_distance(p)[0] for p in [
        (-69.316337934, -8.89, -0.226399396),
    ]]
    chamfer1_side_4 = [part.faces().sort_by_distance(p)[0] for p in [
        (-69.316337934, -7.62, -0.226399396),
    ]]
    chamfer1_edges_5 = [part.edges().sort_by_distance(p)[0] for p in [
        (-41.117257934, -8.89, -0.226399396),
    ]]
    chamfer1_side_5 = [part.faces().sort_by_distance(p)[0] for p in [
        (-41.117257934, -7.62, -0.226399396),
    ]]
    chamfer1_edges_6 = [part.edges().sort_by_distance(p)[0] for p in [
        (-34.767257934, -8.89, -0.226399396),
    ]]
    chamfer1_side_6 = [part.faces().sort_by_distance(p)[0] for p in [
        (-34.767257934, -7.62, -0.226399396),
    ]]
    chamfer1 = BRepFilletAPI_MakeChamfer(part.part.solid().wrapped)
    for e in chamfer1_edges_1:
        chamfer1.Add(CHAMFER1_SIZE, CHAMFER1_SIZE2, e.wrapped, chamfer1_side_1[0].wrapped)  # the first distance lies on this face
    for e in chamfer1_edges_2:
        chamfer1.Add(CHAMFER1_SIZE, CHAMFER1_SIZE2, e.wrapped, chamfer1_side_2[0].wrapped)  # the first distance lies on this face
    for e in chamfer1_edges_3:
        chamfer1.Add(CHAMFER1_SIZE, CHAMFER1_SIZE2, e.wrapped, chamfer1_side_3[0].wrapped)  # the first distance lies on this face
    for e in chamfer1_edges_4:
        chamfer1.Add(CHAMFER1_SIZE, CHAMFER1_SIZE2, e.wrapped, chamfer1_side_4[0].wrapped)  # the first distance lies on this face
    for e in chamfer1_edges_5:
        chamfer1.Add(CHAMFER1_SIZE, CHAMFER1_SIZE2, e.wrapped, chamfer1_side_5[0].wrapped)  # the first distance lies on this face
    for e in chamfer1_edges_6:
        chamfer1.Add(CHAMFER1_SIZE, CHAMFER1_SIZE2, e.wrapped, chamfer1_side_6[0].wrapped)  # the first distance lies on this face
    add(Compound.cast(chamfer1.Shape()), mode=Mode.REPLACE)

    # Sketch19 → Boss-Extrude6 (add, along a direction that is not the sketch's normal)
    with BuildSketch(Plane(origin=(0, -0.277564913, 5.296254044), x_dir=(1, 0, 0), z_dir=(0, -0.05233595624294739, 0.9986295347545737))):
        Polygon((-82.267805784, 73.934460069), (-77.168366414, 73.934460069), (-77.168366414, 70.703944844), (-124.684650731, 2.821431587), (-132.045380565, 2.821431587), align=None)
        with Locations((-72.247116414, 35.19858863)):
            Rectangle(SKETCH19_W, SKETCH19_H)
        Polygon((-67.036086729, 73.934460069), (-60.635845511, 73.934460069), (-35.400503345, 2.821431587), (-41.800744563, 2.821431587), align=None)
    extrude(amount=-BOSS_EXTRUDE6_DEPTH, dir=(0, 0, 1))


solid = part.part
